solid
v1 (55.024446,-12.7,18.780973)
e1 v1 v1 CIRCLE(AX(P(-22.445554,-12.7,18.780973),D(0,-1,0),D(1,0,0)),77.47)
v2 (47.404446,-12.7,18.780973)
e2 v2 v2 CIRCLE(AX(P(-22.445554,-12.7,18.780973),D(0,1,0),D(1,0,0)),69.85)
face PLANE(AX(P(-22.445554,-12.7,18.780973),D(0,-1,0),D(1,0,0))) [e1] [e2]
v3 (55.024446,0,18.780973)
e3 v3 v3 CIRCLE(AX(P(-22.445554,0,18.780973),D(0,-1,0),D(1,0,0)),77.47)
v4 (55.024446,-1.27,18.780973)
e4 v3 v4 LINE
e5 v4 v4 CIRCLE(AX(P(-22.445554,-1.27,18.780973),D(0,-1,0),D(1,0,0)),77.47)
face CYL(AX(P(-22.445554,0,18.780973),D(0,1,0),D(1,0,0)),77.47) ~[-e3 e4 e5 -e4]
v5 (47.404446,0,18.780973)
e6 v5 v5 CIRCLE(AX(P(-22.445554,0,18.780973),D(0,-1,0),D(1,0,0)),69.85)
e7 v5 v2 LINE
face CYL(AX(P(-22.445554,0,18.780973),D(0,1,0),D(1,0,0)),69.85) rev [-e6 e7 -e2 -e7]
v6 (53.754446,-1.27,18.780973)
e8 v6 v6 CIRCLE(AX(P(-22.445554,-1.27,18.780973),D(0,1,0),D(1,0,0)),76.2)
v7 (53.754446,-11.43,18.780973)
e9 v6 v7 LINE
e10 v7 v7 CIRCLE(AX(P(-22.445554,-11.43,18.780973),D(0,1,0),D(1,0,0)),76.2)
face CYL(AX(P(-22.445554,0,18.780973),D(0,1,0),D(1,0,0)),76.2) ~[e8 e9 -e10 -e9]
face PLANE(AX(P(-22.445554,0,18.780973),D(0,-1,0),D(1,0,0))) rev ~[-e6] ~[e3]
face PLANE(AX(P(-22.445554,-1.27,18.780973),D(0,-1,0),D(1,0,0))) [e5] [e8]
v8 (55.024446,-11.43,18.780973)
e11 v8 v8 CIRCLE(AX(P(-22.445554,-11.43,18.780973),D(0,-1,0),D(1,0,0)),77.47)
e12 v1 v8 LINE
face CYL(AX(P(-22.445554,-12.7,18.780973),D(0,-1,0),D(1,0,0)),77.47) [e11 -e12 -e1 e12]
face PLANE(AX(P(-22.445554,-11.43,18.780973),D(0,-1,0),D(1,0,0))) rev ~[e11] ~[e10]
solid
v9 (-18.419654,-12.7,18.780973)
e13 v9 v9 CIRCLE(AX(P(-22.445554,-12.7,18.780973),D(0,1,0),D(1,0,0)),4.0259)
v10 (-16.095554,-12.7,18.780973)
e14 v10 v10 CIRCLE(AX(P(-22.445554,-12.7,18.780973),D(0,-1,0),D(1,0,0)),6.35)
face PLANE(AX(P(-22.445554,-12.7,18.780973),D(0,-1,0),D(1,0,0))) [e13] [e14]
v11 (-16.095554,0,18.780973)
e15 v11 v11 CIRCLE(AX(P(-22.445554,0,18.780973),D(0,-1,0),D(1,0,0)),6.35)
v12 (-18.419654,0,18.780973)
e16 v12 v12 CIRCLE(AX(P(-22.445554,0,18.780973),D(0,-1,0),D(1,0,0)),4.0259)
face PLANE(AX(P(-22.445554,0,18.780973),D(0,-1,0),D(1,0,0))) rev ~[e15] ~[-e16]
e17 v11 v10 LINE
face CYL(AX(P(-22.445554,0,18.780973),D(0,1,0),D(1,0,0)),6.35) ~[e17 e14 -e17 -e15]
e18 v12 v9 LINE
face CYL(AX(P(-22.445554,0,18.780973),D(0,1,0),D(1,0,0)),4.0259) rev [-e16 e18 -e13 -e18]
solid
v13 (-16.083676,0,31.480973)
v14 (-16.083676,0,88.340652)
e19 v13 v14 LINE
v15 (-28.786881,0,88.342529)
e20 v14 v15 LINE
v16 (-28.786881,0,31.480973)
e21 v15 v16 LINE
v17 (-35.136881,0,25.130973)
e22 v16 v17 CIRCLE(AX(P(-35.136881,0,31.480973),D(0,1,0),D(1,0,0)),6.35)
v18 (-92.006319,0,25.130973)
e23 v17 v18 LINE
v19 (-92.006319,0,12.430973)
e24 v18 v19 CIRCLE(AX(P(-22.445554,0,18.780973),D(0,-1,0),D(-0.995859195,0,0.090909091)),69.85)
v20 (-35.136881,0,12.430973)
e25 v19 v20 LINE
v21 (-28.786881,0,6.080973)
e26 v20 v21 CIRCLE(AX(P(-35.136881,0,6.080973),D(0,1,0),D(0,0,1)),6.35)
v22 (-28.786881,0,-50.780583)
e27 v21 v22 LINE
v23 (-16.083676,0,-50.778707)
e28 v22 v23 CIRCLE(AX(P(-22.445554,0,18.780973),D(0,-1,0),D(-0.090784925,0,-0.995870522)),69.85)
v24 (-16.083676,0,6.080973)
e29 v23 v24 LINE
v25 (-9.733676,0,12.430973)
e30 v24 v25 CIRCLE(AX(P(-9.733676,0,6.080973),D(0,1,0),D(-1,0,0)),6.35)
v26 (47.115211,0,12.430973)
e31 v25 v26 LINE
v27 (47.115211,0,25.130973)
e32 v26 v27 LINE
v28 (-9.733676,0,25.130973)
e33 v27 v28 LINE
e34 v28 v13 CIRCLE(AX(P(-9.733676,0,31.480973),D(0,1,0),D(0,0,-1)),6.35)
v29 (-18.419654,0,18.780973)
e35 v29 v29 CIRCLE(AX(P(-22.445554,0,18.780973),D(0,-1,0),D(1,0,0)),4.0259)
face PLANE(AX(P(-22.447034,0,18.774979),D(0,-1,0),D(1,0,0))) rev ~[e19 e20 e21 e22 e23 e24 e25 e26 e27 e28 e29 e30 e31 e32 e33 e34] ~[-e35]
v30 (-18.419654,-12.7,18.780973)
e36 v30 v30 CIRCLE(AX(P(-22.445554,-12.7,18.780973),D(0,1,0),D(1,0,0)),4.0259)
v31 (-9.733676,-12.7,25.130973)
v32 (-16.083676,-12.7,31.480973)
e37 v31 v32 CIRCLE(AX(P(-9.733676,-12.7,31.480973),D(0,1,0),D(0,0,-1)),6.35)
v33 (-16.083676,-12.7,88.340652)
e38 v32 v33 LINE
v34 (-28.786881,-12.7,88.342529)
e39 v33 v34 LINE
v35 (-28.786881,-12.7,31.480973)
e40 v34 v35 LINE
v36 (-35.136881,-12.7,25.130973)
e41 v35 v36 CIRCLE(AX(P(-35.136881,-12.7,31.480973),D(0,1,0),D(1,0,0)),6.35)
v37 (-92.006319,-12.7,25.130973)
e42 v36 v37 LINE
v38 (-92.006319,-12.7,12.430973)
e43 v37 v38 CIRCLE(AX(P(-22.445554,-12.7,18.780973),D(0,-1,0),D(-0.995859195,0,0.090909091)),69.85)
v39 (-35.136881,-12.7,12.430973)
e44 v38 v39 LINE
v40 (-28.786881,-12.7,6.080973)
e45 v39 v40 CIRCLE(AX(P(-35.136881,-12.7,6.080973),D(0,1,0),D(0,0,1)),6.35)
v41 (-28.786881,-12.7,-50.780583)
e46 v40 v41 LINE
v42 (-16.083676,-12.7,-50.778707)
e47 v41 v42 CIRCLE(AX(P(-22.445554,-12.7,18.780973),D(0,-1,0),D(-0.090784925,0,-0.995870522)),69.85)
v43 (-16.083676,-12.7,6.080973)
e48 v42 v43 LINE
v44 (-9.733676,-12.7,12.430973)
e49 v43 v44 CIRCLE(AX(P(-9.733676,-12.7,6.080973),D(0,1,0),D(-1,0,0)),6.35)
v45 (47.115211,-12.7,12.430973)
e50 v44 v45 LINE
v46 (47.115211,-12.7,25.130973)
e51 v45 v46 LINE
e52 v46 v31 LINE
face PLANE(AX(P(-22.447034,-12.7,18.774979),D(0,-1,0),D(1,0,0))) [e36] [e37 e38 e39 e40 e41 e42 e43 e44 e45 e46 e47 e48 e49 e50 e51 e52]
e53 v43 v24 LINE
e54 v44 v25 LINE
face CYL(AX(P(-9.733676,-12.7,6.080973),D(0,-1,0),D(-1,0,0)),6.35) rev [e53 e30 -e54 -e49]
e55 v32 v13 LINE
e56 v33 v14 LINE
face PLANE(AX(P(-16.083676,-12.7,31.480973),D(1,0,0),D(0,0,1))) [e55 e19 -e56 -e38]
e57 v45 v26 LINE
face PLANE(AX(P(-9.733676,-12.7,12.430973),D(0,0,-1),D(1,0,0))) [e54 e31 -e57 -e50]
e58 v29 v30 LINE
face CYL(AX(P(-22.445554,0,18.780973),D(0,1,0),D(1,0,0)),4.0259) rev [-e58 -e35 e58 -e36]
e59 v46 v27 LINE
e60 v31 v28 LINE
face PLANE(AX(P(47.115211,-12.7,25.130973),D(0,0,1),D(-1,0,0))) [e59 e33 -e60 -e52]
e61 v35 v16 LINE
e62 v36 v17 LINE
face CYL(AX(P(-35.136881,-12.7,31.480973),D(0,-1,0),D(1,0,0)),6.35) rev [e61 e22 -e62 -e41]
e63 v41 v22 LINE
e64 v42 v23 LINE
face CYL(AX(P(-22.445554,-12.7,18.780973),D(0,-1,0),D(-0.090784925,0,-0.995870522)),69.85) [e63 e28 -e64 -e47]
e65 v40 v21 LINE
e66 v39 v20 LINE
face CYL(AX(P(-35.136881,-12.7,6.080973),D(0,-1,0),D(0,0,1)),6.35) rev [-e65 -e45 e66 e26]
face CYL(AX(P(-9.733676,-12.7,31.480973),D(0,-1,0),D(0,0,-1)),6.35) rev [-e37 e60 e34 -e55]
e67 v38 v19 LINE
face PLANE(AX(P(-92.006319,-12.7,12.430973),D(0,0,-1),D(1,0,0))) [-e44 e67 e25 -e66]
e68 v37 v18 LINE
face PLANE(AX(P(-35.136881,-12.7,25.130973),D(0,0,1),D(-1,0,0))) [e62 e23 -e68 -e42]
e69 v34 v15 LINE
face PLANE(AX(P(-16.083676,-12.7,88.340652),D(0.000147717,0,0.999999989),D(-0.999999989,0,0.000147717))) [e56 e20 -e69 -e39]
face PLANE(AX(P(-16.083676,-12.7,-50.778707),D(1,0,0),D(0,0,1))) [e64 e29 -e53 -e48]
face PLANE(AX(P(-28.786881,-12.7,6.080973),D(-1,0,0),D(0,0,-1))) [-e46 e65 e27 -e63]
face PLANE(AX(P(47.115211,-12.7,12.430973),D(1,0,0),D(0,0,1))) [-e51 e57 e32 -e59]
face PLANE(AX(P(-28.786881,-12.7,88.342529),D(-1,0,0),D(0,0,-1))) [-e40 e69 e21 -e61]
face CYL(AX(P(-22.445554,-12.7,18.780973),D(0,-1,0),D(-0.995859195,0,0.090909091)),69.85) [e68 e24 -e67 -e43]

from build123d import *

# Parameters (mm, degrees)
F0_R      = 76.2
F2_DEPTH  = 12.7
F3_R      = 77.47
F4_DEPTH  = 1.27
F5_R      = 77.47
F6_DEPTH  = 1.27
F7_R      = 4.0259
F8_DEPTH  = 25.4
F1_R      = 69.85
F10_DEPTH = 25.4
F11_R     = 6.35
F12_DEPTH = 12.7
F13_DEPTH = 25.4
F15_DEPTH = 12.7
F16_DEPTH = 25.4


# Not quite as in the source:
# - the program builds the solid bodies; features that only make, move or delete a surface that nothing else refers to are left out


with BuildPart() as f2:
    # F0 (on Front) → F2 (new body)
    with BuildSketch(Plane.XZ):
        with Locations((-22.4455539137, 18.7809728086)):
            Circle(F0_R)
    extrude(amount=F2_DEPTH)

    # F3 (on face) → F4 (join)
    with BuildSketch(Plane.XZ.offset(12.7)):
        with Locations((-22.4455539137, 18.7809728086)):
            Circle(F3_R)
    extrude(amount=-F4_DEPTH)

    # F5 (on face) → F6 (join)
    with BuildSketch(Plane.XZ):
        with Locations((-22.4455539137, 18.7809728086)):
            Circle(F5_R)
    extrude(amount=F6_DEPTH)

    # F7 (on face) → F8 (cut)
    with BuildSketch(Plane.XZ):
        with Locations((-22.4455539137, 18.7809728086)):
            Circle(F7_R)
    extrude(amount=F8_DEPTH, mode=Mode.SUBTRACT)

    # F1 (on face) → F10 (cut)
    with BuildSketch(Plane.XZ):
        with Locations((-22.4455539137, 18.7809728086)):
            Circle(F1_R)
    extrude(amount=F10_DEPTH, mode=Mode.SUBTRACT)


with BuildPart() as f12:
    # F11 (on face) → F12 (new body)
    with BuildSketch(Plane.XZ):
        with Locations((-22.4455539137, 18.7809728086)):
            Circle(F11_R)
    extrude(amount=F12_DEPTH)

    # F7 (on face) → F13 (cut)
    with BuildSketch(Plane.XZ):
        with Locations((-22.4455539137, 18.7809728086)):
            Circle(F7_R)
    extrude(amount=F13_DEPTH, mode=Mode.SUBTRACT)


with BuildPart() as f15:
    # F14 (on face) → F15 (new body)
    with BuildSketch(Plane.XZ.offset(12.7)):
        with BuildLine():
            Line((-16.083676368, -50.7787067054), (-16.083676368, -44.7071496457))
            Line((-16.083676368, -44.7071496457), (-16.083676368, 6.0809728086))
            ThreePointArc((-16.083676368, 6.0809728086), (-14.2238044285, 10.5711008691), (-9.733676368, 12.4309728086))
            Line((-9.733676368, 12.4309728086), (47.1152108894, 12.4309728086))
            Line((47.1152108894, 12.4309728086), (47.1152108894, 25.1309728086))
            Line((47.1152108894, 25.1309728086), (-9.733676368, 25.1309728086))
            ThreePointArc((-9.733676368, 25.1309728086), (-14.2238044285, 26.9908447481), (-16.083676368, 31.4809728086))
            Line((-16.083676368, 31.4809728086), (-16.083676368, 82.2690952629))
            Line((-16.083676368, 82.2690952629), (-16.083676368, 88.3406523226))
            Line((-16.083676368, 88.3406523226), (-28.7868808955, 88.3425288012))
            Line((-28.7868808955, 88.3425288012), (-28.7868808955, 31.4809728086))
            ThreePointArc((-28.7868808955, 31.4809728086), (-30.646752835, 26.9908447481), (-35.1368808955, 25.1309728086))
            Line((-35.1368808955, 25.1309728086), (-92.0063187169, 25.1309728086))
            ThreePointArc((-92.0063187169, 25.1309728086), (-92.2955539137, 18.7809728086), (-92.0063187169, 12.4309728086))
            Line((-92.0063187169, 12.4309728086), (-35.1368808955, 12.4309728086))
            ThreePointArc((-35.1368808955, 12.4309728086), (-30.646752835, 10.5711008691), (-28.7868808955, 6.0809728086))
            Line((-28.7868808955, 6.0809728086), (-28.7868808955, -50.780583184))
            ThreePointArc((-28.7868808955, -50.780583184), (-22.4352358852, -51.0690264293), (-16.083676368, -50.7787067054))
        make_face()
    extrude(amount=-F15_DEPTH)

    # F7 (on face) → F16 (cut)
    with BuildSketch(Plane.XZ):
        with Locations((-22.4455539137, 18.7809728086)):
            Circle(F7_R)
    extrude(amount=F16_DEPTH, mode=Mode.SUBTRACT)


solid = Compound([f2.part, f12.part, f15.part])
